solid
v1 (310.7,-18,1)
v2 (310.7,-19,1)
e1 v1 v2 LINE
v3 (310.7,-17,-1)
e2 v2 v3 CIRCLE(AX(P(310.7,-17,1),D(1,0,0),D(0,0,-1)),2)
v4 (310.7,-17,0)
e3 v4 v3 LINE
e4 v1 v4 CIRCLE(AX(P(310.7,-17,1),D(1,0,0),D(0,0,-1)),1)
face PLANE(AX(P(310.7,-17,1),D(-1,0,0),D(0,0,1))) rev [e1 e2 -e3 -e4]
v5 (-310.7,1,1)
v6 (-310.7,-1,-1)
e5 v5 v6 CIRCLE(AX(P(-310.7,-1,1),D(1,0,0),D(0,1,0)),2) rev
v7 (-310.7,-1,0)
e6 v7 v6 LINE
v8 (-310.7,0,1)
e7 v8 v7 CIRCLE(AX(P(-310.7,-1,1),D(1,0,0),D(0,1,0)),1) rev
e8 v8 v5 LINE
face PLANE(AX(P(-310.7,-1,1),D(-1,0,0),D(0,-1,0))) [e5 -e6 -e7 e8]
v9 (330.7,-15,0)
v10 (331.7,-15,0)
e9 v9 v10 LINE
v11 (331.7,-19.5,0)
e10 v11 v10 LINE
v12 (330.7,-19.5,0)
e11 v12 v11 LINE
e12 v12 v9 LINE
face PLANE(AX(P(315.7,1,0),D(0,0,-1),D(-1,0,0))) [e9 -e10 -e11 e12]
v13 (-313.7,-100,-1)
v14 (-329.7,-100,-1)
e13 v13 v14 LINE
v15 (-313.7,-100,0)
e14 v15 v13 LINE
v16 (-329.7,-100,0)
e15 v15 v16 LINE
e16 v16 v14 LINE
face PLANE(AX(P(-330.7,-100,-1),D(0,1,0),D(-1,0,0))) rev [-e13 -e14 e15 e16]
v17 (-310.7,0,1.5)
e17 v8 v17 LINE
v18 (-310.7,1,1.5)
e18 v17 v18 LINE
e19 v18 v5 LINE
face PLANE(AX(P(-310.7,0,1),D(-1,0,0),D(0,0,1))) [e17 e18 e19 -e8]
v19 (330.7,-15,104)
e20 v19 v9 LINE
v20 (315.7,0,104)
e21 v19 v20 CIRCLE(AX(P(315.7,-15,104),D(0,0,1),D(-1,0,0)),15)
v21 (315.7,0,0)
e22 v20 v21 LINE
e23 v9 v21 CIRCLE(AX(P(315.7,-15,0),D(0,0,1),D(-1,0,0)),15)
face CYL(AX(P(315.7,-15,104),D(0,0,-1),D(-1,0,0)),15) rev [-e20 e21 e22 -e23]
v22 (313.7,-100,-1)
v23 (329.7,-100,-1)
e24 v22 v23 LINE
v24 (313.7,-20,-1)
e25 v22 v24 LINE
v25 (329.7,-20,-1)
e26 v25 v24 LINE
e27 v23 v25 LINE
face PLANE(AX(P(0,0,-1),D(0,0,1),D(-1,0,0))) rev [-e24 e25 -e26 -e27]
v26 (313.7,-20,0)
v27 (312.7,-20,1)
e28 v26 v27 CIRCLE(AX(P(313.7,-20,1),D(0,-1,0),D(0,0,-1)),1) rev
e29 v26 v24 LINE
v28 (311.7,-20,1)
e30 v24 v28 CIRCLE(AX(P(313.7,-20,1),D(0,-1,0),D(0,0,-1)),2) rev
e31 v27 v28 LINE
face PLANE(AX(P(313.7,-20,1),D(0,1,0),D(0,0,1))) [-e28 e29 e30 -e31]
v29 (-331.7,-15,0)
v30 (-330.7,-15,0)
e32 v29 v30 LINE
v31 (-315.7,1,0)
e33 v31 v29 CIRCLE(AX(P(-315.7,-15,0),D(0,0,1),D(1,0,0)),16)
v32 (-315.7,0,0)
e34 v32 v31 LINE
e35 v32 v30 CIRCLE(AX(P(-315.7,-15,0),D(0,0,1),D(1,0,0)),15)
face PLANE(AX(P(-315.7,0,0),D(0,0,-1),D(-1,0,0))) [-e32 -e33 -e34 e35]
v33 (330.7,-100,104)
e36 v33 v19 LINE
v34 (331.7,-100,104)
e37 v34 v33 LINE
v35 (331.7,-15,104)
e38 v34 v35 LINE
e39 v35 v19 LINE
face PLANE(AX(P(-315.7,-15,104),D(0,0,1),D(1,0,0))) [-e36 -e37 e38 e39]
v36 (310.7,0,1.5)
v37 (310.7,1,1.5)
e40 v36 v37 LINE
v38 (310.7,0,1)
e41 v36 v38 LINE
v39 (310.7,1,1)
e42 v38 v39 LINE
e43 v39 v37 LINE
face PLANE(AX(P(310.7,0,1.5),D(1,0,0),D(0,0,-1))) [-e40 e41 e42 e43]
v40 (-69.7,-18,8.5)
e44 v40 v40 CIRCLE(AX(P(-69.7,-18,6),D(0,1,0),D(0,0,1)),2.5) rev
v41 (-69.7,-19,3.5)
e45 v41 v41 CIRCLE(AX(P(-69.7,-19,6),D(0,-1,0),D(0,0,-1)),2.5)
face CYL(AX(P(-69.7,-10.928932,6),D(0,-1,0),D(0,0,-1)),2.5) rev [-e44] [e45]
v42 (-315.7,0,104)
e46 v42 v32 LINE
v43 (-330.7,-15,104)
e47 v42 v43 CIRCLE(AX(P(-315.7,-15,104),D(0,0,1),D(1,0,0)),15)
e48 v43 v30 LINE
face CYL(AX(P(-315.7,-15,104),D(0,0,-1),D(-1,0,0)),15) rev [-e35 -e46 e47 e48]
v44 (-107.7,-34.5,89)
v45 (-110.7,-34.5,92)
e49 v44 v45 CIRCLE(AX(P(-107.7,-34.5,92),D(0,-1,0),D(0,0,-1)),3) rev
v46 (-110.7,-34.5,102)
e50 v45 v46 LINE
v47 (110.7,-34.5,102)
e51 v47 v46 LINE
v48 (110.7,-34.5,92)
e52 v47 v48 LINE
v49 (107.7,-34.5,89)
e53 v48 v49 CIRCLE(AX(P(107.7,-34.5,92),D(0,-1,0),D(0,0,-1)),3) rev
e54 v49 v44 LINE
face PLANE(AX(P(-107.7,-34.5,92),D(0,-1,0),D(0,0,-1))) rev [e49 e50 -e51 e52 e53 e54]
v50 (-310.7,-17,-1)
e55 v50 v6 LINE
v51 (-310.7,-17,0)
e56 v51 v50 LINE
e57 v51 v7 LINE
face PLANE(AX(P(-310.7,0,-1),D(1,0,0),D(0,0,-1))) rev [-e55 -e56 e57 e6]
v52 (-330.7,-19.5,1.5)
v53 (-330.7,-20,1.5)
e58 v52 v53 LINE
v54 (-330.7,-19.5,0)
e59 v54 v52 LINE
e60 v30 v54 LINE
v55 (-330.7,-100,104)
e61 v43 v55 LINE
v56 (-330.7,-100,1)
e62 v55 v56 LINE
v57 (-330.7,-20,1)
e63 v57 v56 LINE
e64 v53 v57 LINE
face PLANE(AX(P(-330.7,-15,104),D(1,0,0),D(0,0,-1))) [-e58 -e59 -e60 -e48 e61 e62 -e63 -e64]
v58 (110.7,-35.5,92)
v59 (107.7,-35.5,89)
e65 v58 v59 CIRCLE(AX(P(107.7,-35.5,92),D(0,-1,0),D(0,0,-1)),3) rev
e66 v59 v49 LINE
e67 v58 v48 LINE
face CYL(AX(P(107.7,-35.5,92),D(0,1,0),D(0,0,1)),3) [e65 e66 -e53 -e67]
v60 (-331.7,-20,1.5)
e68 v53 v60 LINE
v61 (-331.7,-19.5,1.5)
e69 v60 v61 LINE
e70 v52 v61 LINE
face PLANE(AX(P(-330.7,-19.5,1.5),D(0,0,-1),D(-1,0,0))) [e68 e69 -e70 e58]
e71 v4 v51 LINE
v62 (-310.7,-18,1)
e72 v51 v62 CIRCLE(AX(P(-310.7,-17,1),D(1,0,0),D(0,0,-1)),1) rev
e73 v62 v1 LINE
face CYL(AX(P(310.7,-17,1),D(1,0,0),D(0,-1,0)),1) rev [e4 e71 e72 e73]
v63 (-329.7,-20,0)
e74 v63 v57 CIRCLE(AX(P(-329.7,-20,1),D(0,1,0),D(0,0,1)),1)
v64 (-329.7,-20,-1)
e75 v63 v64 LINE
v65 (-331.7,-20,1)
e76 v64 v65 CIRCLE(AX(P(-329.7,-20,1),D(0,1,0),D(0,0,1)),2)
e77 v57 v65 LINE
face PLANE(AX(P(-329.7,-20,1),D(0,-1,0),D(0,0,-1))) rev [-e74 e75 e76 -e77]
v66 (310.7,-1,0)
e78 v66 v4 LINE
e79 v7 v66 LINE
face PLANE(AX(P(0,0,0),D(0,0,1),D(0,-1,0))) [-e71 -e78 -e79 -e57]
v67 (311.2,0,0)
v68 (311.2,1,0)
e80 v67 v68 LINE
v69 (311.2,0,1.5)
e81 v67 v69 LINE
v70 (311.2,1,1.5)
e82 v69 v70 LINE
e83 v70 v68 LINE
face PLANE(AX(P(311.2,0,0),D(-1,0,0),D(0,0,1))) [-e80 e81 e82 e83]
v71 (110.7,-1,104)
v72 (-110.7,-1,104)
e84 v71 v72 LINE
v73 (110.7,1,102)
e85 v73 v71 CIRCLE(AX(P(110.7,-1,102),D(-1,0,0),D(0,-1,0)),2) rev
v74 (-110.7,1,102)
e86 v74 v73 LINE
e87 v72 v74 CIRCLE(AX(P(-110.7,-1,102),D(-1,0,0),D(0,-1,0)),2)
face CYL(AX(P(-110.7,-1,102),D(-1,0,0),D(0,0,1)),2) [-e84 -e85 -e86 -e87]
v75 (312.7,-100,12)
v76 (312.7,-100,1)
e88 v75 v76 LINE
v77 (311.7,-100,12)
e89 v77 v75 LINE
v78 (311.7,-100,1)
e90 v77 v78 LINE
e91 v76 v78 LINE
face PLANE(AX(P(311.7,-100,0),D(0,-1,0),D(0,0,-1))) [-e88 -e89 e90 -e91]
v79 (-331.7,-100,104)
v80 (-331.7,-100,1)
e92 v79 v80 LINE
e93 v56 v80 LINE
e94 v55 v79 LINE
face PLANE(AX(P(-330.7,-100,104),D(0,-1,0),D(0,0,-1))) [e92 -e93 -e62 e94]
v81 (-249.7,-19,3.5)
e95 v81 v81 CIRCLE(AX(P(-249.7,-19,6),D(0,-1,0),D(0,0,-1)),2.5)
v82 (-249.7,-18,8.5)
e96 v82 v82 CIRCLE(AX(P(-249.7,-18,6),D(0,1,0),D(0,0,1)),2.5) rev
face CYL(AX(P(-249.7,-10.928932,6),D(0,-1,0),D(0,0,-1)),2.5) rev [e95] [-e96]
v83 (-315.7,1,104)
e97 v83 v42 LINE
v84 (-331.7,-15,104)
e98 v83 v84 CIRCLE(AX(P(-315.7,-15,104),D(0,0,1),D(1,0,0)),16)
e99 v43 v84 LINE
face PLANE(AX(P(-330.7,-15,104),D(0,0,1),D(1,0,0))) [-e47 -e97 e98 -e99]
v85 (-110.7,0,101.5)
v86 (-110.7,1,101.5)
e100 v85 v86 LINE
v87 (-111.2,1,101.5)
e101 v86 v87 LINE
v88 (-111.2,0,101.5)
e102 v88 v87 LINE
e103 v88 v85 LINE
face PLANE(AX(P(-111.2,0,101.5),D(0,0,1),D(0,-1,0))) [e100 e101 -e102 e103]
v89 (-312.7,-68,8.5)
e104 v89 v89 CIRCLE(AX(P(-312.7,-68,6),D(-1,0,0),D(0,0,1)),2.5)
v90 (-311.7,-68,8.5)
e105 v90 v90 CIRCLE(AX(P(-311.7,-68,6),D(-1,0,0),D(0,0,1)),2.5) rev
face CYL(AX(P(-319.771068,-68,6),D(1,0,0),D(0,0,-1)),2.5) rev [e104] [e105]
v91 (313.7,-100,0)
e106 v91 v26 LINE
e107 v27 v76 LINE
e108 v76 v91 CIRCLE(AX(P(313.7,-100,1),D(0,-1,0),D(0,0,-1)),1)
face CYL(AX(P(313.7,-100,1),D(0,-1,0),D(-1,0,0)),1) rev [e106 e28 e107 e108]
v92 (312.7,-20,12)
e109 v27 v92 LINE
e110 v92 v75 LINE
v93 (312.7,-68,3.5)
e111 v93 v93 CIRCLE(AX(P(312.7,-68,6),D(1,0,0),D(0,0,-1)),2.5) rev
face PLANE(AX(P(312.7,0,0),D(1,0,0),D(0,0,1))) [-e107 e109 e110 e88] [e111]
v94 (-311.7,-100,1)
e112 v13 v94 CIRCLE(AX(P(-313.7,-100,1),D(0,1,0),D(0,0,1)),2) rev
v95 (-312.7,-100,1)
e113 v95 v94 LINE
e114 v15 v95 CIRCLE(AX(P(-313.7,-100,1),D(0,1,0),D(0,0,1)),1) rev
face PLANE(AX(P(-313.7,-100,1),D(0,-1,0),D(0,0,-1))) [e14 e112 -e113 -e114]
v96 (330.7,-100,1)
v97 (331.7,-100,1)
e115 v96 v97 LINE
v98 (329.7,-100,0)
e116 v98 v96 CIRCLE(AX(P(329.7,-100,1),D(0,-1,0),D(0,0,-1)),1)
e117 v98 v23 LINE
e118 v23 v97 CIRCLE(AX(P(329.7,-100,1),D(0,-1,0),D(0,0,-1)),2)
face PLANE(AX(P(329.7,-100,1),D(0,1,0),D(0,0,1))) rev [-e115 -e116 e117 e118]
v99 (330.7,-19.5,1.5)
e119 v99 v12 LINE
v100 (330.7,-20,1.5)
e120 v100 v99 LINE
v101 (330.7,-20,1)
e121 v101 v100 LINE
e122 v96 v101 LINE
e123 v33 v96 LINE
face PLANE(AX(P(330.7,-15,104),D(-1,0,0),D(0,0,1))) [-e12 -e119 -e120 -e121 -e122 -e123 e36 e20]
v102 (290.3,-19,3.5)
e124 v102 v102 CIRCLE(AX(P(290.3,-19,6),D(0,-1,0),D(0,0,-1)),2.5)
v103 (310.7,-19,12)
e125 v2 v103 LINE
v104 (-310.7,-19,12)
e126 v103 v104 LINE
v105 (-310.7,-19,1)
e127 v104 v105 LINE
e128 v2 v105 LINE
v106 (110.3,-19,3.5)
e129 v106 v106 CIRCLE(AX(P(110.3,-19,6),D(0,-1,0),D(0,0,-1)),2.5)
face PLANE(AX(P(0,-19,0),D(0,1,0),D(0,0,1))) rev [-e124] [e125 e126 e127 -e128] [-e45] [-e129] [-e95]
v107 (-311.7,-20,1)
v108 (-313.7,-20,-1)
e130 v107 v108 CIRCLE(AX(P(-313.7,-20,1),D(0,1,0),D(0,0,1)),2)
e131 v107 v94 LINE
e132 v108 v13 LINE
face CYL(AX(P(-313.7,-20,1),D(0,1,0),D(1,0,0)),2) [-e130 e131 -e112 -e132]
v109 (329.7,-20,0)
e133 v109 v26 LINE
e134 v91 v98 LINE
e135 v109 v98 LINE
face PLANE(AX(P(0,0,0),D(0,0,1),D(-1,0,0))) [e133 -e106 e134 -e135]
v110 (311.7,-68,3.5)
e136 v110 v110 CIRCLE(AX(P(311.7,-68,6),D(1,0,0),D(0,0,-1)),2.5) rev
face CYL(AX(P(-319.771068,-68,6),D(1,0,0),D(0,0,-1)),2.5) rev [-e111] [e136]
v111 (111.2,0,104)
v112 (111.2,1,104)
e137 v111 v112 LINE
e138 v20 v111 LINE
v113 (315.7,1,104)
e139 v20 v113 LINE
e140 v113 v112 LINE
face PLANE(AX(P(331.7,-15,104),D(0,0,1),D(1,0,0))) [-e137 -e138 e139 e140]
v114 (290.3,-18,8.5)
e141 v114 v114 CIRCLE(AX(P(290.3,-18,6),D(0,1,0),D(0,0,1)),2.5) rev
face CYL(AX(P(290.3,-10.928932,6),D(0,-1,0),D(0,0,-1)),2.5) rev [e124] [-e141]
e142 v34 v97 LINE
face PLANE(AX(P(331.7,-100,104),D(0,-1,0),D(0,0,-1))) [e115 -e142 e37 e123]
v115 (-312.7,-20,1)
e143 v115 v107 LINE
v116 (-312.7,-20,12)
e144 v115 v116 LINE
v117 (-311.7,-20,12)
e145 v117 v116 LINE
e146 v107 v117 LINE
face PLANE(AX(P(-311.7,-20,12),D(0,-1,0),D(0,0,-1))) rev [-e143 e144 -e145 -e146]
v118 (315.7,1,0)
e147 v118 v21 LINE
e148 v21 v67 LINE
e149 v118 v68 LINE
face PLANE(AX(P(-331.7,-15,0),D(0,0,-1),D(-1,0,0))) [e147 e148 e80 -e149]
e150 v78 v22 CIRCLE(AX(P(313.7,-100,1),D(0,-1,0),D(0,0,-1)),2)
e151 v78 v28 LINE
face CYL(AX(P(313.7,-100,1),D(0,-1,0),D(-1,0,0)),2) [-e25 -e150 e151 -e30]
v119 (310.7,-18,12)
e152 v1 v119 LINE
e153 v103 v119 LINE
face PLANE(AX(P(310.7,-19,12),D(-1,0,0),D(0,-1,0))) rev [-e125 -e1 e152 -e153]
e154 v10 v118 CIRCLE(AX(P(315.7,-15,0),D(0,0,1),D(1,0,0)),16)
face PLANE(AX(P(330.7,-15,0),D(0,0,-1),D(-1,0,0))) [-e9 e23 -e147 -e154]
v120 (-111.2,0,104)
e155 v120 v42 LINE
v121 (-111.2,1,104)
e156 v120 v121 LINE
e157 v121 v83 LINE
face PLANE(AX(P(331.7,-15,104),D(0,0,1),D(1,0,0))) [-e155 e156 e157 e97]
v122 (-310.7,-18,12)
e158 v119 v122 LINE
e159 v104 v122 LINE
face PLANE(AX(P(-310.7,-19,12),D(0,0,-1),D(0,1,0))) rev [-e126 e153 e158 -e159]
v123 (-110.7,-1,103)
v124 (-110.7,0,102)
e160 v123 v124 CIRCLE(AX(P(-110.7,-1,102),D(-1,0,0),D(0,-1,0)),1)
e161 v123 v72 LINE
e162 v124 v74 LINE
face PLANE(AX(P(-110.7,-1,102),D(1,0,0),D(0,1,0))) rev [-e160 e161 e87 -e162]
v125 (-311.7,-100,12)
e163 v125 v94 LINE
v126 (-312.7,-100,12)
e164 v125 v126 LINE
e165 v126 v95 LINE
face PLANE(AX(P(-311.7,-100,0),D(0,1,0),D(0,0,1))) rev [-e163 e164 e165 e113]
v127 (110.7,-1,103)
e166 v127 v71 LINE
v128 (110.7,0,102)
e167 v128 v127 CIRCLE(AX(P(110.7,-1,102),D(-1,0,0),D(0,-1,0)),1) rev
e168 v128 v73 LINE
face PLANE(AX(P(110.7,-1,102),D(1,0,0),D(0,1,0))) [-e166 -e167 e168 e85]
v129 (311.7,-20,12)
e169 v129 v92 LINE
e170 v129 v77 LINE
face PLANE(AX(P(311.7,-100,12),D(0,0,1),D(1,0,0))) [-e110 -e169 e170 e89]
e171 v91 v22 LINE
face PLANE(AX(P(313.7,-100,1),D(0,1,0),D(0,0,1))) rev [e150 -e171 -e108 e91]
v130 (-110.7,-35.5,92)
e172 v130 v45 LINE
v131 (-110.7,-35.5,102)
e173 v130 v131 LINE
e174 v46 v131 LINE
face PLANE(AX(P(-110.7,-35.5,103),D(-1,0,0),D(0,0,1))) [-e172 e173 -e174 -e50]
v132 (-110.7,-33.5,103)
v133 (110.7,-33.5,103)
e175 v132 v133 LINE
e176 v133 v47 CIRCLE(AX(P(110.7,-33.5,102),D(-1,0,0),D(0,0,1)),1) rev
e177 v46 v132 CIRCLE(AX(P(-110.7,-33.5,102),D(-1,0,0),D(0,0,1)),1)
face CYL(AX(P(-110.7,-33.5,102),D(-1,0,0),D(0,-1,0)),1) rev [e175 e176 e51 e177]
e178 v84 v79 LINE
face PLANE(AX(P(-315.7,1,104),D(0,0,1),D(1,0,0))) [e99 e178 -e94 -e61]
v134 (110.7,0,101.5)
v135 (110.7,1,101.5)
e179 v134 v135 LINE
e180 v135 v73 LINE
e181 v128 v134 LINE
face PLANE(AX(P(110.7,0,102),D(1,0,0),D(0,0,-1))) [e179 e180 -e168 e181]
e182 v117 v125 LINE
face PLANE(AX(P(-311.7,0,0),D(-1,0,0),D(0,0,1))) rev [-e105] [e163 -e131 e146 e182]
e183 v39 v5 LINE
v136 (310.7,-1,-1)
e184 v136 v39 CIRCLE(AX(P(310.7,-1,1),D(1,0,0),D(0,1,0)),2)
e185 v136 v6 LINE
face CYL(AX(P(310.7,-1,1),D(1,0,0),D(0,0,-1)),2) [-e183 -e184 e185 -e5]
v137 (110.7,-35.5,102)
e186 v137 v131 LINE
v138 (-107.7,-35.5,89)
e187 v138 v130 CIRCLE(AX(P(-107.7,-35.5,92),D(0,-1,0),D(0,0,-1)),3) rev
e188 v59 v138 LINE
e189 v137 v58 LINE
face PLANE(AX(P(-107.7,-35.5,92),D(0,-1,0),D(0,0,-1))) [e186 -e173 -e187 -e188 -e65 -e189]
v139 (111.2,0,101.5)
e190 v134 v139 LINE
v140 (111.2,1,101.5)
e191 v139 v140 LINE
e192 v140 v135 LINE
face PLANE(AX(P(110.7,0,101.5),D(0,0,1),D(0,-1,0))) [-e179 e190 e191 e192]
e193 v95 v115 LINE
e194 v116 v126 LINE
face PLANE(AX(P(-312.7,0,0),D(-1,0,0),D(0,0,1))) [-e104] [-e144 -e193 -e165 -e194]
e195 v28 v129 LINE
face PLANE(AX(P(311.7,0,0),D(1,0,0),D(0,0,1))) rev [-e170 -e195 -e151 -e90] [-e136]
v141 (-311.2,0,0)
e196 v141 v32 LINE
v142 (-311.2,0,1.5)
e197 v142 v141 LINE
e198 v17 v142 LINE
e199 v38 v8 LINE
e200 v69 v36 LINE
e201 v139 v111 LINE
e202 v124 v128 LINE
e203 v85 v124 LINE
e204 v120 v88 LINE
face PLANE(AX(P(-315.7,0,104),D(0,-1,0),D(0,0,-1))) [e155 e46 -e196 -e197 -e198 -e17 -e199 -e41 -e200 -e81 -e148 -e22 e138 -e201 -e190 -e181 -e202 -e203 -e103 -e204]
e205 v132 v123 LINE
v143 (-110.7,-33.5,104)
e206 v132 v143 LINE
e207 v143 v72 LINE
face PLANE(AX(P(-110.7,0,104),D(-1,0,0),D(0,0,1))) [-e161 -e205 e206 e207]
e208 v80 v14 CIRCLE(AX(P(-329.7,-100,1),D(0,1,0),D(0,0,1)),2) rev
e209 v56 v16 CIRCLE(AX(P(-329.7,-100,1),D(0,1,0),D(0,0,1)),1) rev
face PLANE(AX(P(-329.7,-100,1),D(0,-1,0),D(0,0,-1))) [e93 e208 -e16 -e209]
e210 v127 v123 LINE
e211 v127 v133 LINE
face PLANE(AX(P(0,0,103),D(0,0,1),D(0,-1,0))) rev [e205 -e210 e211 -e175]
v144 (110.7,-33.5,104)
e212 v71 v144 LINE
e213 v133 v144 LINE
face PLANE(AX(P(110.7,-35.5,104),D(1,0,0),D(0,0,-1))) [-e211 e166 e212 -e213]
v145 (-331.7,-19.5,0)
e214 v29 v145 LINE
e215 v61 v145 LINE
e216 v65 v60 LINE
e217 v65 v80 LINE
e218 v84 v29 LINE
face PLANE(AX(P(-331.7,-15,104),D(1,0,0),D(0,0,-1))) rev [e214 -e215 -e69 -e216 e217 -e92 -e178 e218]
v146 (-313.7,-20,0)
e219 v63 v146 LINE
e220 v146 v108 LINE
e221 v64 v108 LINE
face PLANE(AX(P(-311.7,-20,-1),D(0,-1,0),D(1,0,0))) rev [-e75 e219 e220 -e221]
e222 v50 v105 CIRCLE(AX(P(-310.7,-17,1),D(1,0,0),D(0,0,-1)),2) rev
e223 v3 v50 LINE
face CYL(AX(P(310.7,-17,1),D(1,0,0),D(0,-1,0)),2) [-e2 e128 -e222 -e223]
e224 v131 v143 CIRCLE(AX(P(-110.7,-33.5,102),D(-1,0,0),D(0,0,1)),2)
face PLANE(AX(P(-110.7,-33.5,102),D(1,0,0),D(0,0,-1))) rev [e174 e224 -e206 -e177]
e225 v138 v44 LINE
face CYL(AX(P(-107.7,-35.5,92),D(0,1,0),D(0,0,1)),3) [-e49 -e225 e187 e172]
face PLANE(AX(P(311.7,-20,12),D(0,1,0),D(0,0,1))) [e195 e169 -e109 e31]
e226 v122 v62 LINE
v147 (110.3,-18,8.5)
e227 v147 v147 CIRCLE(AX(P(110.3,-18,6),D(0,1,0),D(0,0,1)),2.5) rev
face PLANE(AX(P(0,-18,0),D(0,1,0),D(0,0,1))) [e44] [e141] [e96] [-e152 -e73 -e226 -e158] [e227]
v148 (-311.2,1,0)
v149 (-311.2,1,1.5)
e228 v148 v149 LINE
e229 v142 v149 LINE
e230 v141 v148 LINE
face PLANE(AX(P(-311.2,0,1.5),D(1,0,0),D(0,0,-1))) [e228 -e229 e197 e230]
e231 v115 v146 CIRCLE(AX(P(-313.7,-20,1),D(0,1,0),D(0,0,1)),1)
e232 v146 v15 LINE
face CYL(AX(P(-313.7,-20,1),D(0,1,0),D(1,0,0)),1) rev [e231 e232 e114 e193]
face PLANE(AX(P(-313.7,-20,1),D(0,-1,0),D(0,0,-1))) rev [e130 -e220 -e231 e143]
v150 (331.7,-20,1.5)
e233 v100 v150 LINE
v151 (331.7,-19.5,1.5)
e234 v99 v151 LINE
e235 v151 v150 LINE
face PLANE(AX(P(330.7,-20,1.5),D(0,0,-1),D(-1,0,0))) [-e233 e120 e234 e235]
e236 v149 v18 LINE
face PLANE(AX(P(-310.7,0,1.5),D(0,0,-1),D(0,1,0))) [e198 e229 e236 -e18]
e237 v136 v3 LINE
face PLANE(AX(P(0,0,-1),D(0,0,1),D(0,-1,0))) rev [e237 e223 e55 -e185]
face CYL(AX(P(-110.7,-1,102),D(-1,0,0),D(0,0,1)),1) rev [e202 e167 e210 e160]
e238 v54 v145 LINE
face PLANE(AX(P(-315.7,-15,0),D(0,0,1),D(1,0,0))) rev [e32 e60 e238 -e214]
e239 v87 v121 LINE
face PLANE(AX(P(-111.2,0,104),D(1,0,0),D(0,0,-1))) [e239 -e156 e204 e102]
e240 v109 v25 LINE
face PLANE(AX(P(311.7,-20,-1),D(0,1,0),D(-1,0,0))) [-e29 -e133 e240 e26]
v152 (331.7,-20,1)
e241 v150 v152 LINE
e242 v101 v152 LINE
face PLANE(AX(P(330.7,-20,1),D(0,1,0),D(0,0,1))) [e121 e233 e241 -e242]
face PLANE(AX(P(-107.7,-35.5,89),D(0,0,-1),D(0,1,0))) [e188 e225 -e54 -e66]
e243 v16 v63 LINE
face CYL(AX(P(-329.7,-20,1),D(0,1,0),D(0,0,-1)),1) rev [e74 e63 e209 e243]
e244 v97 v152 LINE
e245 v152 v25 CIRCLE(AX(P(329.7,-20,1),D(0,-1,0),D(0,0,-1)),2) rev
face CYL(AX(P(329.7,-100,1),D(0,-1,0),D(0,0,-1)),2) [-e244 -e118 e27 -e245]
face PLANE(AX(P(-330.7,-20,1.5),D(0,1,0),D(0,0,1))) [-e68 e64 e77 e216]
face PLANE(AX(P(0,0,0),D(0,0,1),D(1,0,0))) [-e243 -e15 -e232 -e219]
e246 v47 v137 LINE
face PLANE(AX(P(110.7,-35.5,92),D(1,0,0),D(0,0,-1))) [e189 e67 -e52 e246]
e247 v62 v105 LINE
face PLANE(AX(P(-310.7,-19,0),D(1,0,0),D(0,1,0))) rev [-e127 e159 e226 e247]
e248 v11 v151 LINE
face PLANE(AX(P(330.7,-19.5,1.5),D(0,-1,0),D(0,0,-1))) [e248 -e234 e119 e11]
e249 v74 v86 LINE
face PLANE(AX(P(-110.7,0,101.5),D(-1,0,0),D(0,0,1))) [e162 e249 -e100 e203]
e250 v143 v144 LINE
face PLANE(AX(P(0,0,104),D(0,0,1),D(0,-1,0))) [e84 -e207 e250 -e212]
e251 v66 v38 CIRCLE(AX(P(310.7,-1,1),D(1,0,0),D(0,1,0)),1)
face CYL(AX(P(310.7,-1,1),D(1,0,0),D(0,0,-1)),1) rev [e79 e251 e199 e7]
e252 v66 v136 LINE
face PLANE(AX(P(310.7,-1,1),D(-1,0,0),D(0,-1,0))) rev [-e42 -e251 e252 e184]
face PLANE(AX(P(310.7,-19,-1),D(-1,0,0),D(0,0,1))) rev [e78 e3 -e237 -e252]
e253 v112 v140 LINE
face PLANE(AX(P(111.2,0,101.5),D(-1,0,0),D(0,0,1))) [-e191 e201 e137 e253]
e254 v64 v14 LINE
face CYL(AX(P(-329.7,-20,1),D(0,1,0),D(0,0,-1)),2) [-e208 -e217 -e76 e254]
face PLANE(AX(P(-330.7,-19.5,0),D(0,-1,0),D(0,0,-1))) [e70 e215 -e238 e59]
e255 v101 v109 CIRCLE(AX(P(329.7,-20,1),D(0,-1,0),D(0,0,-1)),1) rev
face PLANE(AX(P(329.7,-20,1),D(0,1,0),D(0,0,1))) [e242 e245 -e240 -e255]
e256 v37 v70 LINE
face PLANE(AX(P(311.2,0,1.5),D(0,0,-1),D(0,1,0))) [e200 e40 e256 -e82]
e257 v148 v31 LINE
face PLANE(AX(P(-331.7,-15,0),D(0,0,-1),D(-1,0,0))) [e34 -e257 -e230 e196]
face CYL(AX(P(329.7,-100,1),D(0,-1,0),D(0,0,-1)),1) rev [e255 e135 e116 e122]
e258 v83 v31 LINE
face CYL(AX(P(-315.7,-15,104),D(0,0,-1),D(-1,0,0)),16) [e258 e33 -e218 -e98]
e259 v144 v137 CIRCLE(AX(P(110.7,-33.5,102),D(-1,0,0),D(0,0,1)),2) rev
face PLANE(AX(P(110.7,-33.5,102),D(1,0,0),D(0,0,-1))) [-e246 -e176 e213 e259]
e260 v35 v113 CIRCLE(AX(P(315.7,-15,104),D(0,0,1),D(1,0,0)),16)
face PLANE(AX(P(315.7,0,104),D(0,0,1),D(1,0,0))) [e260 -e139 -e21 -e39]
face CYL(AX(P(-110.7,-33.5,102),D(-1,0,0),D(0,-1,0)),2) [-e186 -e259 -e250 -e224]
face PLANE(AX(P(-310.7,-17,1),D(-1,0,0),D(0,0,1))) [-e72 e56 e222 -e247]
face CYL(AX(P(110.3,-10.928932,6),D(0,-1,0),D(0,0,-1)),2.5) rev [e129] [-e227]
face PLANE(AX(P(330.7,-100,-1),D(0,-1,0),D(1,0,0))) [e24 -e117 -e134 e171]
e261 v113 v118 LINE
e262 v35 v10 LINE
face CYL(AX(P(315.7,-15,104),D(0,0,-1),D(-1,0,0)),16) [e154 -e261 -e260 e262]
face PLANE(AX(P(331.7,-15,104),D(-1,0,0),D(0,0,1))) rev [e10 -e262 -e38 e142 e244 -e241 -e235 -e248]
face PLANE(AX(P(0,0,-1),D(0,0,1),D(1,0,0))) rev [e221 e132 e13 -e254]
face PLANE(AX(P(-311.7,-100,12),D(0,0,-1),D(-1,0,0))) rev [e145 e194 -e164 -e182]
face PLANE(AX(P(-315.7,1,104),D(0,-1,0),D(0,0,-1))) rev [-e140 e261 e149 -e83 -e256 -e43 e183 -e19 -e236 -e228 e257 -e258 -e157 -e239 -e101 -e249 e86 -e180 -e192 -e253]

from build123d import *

# Parameters (mm, degrees)
BASE_FLANGE1_DEPTH             = 104
EDGE_FLANGE1_STRIP_W           = 6
EDGE_FLANGE1_STRIP_H           = 1
EDGE_FLANGE1_STRIP_CUT_DEPTH   = 621.4
EDGE_FLANGE1_RELIEF_W          = 6.5
EDGE_FLANGE1_RELIEF_H          = 0.5
EDGE_FLANGE1_RELIEF_CUT_DEPTH  = 1
EDGE_FLANGE1_DEPTH             = 621.4
EDGE_FLANGE2_STRIP_W           = 6
EDGE_FLANGE2_STRIP_H           = 1
EDGE_FLANGE2_STRIP_CUT_DEPTH   = 621.4
EDGE_FLANGE2_DEPTH             = 621.4
EDGE_FLANGE3_STRIP_W           = 6
EDGE_FLANGE3_STRIP_H           = 1
EDGE_FLANGE3_STRIP_CUT_DEPTH   = 80
EDGE_FLANGE3_RELIEF_W          = 6.5
EDGE_FLANGE3_RELIEF_H          = 0.5
EDGE_FLANGE3_RELIEF_CUT_DEPTH  = 1
EDGE_FLANGE3_DEPTH             = 80
EDGE_FLANGE4_STRIP_W           = 6
EDGE_FLANGE4_STRIP_H           = 1
EDGE_FLANGE4_STRIP_CUT_DEPTH   = 80
EDGE_FLANGE4_DEPTH             = 80
EDGE_FLANGE5_STRIP_W           = 6
EDGE_FLANGE5_STRIP_H           = 1
EDGE_FLANGE5_STRIP_CUT_DEPTH   = 221.4
EDGE_FLANGE5_RELIEF_W          = 6.5
EDGE_FLANGE5_RELIEF_H          = 0.5
EDGE_FLANGE5_RELIEF_CUT_DEPTH  = 1
EDGE_FLANGE5_DEPTH             = 221.4
SKETCH22_R                     = 2.5
CUT_EXTRUDE1_DEPTH             = 1
SKETCH23_R                     = 2.5
CUT_EXTRUDE2_DEPTH             = 3
CUT_EXTRUDE2_DIRECTION_2_REACH = 661.378
EDGE_FLANGE6_STRIP_W           = 6
EDGE_FLANGE6_STRIP_H           = 1
EDGE_FLANGE6_STRIP_CUT_DEPTH   = 221.4
EDGE_FLANGE6_DEPTH             = 221.4
EDGE_FLANGE6_FLAT_DEPTH        = 1


# Sheet-metal steps are written as plain solids
with BuildPart() as part:
    # Sketch1 → Base-Flange1 (new body)
    with BuildSketch(Plane.XY):
        with BuildLine():
            Line((-330.7, -100), (-330.7, -15))
            ThreePointArc((-330.7, -15), (-326.306601718, -4.393398282), (-315.7, 0))
            Line((-315.7, 0), (315.7, 0))
            ThreePointArc((315.7, 0), (326.306601718, -4.393398282), (330.7, -15))
            Line((330.7, -15), (330.7, -100))
            Line((330.7, -100), (331.7, -100))
            Line((331.7, -100), (331.7, -15))
            ThreePointArc((331.7, -15), (327.013708499, -3.686291501), (315.7, 1))
            Line((315.7, 1), (-315.7, 1))
            ThreePointArc((-315.7, 1), (-327.013708499, -3.686291501), (-331.7, -15))
            Line((-331.7, -15), (-331.7, -100))
            Line((-331.7, -100), (-330.7, -100))
        make_face()
    extrude(amount=BASE_FLANGE1_DEPTH)

    # Edge-Flange1 strip (across the edge) → Edge-Flange1 strip cut (cut)
    with BuildSketch(Plane(origin=(-310.7, 0, 0), x_dir=(0, 0, 1), z_dir=(1, 0, 0))):
        with Locations((-2, -0.5)):
            Rectangle(EDGE_FLANGE1_STRIP_W, EDGE_FLANGE1_STRIP_H)
    extrude(amount=EDGE_FLANGE1_STRIP_CUT_DEPTH, mode=Mode.SUBTRACT)

    # Edge-Flange1 relief (on the sheet) → Edge-Flange1 relief cut (cut)
    with BuildSketch(Plane(origin=(-310.7, 0, 1), x_dir=(0, 0, 1), z_dir=(0, -1, 0))):
        with Locations((-2.75, 0.25)):
            Rectangle(EDGE_FLANGE1_RELIEF_W, EDGE_FLANGE1_RELIEF_H)
        with Locations((-2.75, -621.65)):
            Rectangle(EDGE_FLANGE1_RELIEF_W, EDGE_FLANGE1_RELIEF_H)
    extrude(amount=-EDGE_FLANGE1_RELIEF_CUT_DEPTH, mode=Mode.SUBTRACT)

    # Edge-Flange1 section (across the edge) → Edge-Flange1 (add)
    with BuildSketch(Plane(origin=(-310.7, 0, 0), x_dir=(0, 0, 1), z_dir=(1, 0, 0))):
        with BuildLine():
            Line((-1, 1), (-1, 19))
            Line((-1, 19), (0, 19))
            Line((0, 19), (0, 1))
            ThreePointArc((0, 1), (0.292893219, 0.292893219), (1, 0))
            Line((1, 0), (1, -1))
            ThreePointArc((1, -1), (-0.414213562, -0.414213562), (-1, 1))
        make_face()
    extrude(amount=EDGE_FLANGE1_DEPTH)

    # Edge-Flange2 strip (across the edge) → Edge-Flange2 strip cut (cut)
    with BuildSketch(Plane(origin=(-310.7, -19, 0), x_dir=(0, 1, 0), z_dir=(1, 0, 0))):
        with Locations((-1, -0.5)):
            Rectangle(EDGE_FLANGE2_STRIP_W, EDGE_FLANGE2_STRIP_H)
    extrude(amount=EDGE_FLANGE2_STRIP_CUT_DEPTH, mode=Mode.SUBTRACT)

    # Edge-Flange2 section (across the edge) → Edge-Flange2 (add)
    with BuildSketch(Plane(origin=(-310.7, -19, 0), x_dir=(0, 1, 0), z_dir=(1, 0, 0))):
        with BuildLine():
            Line((0, 1), (0, 12))
            Line((0, 12), (1, 12))
            Line((1, 12), (1, 1))
            ThreePointArc((1, 1), (1.292893219, 0.292893219), (2, 0))
            Line((2, 0), (2, -1))
            ThreePointArc((2, -1), (0.585786438, -0.414213562), (0, 1))
        make_face()
    extrude(amount=EDGE_FLANGE2_DEPTH)

    # Edge-Flange3 strip (across the edge) → Edge-Flange3 strip cut (cut)
    with BuildSketch(Plane(origin=(-330.7, -100, 0), x_dir=(0, 0, 1), z_dir=(0, 1, 0))):
        with Locations((-2, -0.5)):
            Rectangle(EDGE_FLANGE3_STRIP_W, EDGE_FLANGE3_STRIP_H)
    edge_flange3_strip_cut = extrude(amount=EDGE_FLANGE3_STRIP_CUT_DEPTH, mode=Mode.SUBTRACT)

    # Edge-Flange3 relief (on the sheet) → Edge-Flange3 relief cut (cut)
    with BuildSketch(Plane(origin=(-330.7, -100, 1), x_dir=(0, 0, 1), z_dir=(1, 0, 0))):
        with Locations((-2.75, -80.25)):
            Rectangle(EDGE_FLANGE3_RELIEF_W, EDGE_FLANGE3_RELIEF_H)
    edge_flange3_relief_cut = extrude(amount=-EDGE_FLANGE3_RELIEF_CUT_DEPTH, mode=Mode.SUBTRACT)

    # Edge-Flange3 section (across the edge) → Edge-Flange3 (add)
    with BuildSketch(Plane(origin=(-330.7, -100, 0), x_dir=(0, 0, 1), z_dir=(0, 1, 0))):
        with BuildLine():
            Line((-1, 1), (-1, 19))
            Line((-1, 19), (0, 19))
            Line((0, 19), (0, 1))
            ThreePointArc((0, 1), (0.292893219, 0.292893219), (1, 0))
            Line((1, 0), (1, -1))
            ThreePointArc((1, -1), (-0.414213562, -0.414213562), (-1, 1))
        make_face()
    edge_flange3 = extrude(amount=EDGE_FLANGE3_DEPTH)

    # Edge-Flange4 strip (across the edge) → Edge-Flange4 strip cut (cut)
    with BuildSketch(Plane(origin=(-311.7, -100, 0), x_dir=(-1, 0, 0), z_dir=(0, 1, 0))):
        with Locations((-1, -0.5)):
            Rectangle(EDGE_FLANGE4_STRIP_W, EDGE_FLANGE4_STRIP_H)
    edge_flange4_strip_cut = extrude(amount=EDGE_FLANGE4_STRIP_CUT_DEPTH, mode=Mode.SUBTRACT)

    # Edge-Flange4 section (across the edge) → Edge-Flange4 (add)
    with BuildSketch(Plane(origin=(-311.7, -100, 0), x_dir=(-1, 0, 0), z_dir=(0, 1, 0))):
        with BuildLine():
            Line((0, 1), (0, 12))
            Line((0, 12), (1, 12))
            Line((1, 12), (1, 1))
            ThreePointArc((1, 1), (1.292893219, 0.292893219), (2, 0))
            Line((2, 0), (2, -1))
            ThreePointArc((2, -1), (0.585786438, -0.414213562), (0, 1))
        make_face()
    edge_flange4 = extrude(amount=EDGE_FLANGE4_DEPTH)

    # Mirror1: Edge-Flange3 strip cut, Edge-Flange3 relief cut, Edge-Flange3, Edge-Flange4 strip cut, Edge-Flange4 across plane
    add(edge_flange3_strip_cut.mirror(Plane(origin=(0, 0, 0), x_dir=(0, 0, 1), z_dir=(1, 0, 0))), mode=Mode.SUBTRACT)
    add(edge_flange3_relief_cut.mirror(Plane(origin=(0, 0, 0), x_dir=(0, 0, 1), z_dir=(1, 0, 0))), mode=Mode.SUBTRACT)
    add(edge_flange3.mirror(Plane(origin=(0, 0, 0), x_dir=(0, 0, 1), z_dir=(1, 0, 0))))
    add(edge_flange4_strip_cut.mirror(Plane(origin=(0, 0, 0), x_dir=(0, 0, 1), z_dir=(1, 0, 0))), mode=Mode.SUBTRACT)
    add(edge_flange4.mirror(Plane(origin=(0, 0, 0), x_dir=(0, 0, 1), z_dir=(1, 0, 0))))

    # Edge-Flange5 strip (across the edge) → Edge-Flange5 strip cut (cut)
    with BuildSketch(Plane(origin=(110.7, 0, 104), x_dir=(0, 0, -1), z_dir=(-1, 0, 0))):
        with Locations((-1, -0.5)):
            Rectangle(EDGE_FLANGE5_STRIP_W, EDGE_FLANGE5_STRIP_H)
    extrude(amount=EDGE_FLANGE5_STRIP_CUT_DEPTH, mode=Mode.SUBTRACT)

    # Edge-Flange5 relief (on the sheet) → Edge-Flange5 relief cut (cut)
    with BuildSketch(Plane(origin=(110.7, 0, 102), x_dir=(0, 0, -1), z_dir=(0, -1, 0))):
        with Locations((-2.75, 0.25)):
            Rectangle(EDGE_FLANGE5_RELIEF_W, EDGE_FLANGE5_RELIEF_H)
        with Locations((-2.75, -221.65)):
            Rectangle(EDGE_FLANGE5_RELIEF_W, EDGE_FLANGE5_RELIEF_H)
    extrude(amount=-EDGE_FLANGE5_RELIEF_CUT_DEPTH, mode=Mode.SUBTRACT)

    # Edge-Flange5 section (across the edge) → Edge-Flange5 (add)
    with BuildSketch(Plane(origin=(110.7, 0, 104), x_dir=(0, 0, -1), z_dir=(-1, 0, 0))):
        with BuildLine():
            Line((0, 1), (0, 35.5))
            Line((0, 35.5), (1, 35.5))
            Line((1, 35.5), (1, 1))
            ThreePointArc((1, 1), (1.292893219, 0.292893219), (2, 0))
            Line((2, 0), (2, -1))
            ThreePointArc((2, -1), (0.585786438, -0.414213562), (0, 1))
        make_face()
    extrude(amount=EDGE_FLANGE5_DEPTH)

    # Sketch22 → Cut-Extrude1 (cut)
    with BuildSketch(Plane.XZ.offset(19)):
        with Locations(Location((-249.7, 6, 0), (0, 0, 270))):
            Circle(SKETCH22_R)
        with Locations(Location((-69.7, 6, 0), (0, 0, 270))):
            Circle(SKETCH22_R)
        with Locations(Location((110.3, 6, 0), (0, 0, 270))):
            Circle(SKETCH22_R)
        with Locations(Location((290.3, 6, 0), (0, 0, 270))):
            Circle(SKETCH22_R)
        with Locations((470.3, 6)):
            Circle(SKETCH22_R)
        with Locations((650.3, 6)):
            Circle(SKETCH22_R)
        with Locations((830.3, 6)):
            Circle(SKETCH22_R)
    extrude(amount=-CUT_EXTRUDE1_DEPTH, mode=Mode.SUBTRACT)

    # Sketch23 → Cut-Extrude2 (cut)
    with BuildSketch(Plane.ZY.offset(-311.7)):
        with Locations(Location((6, -68, 0), (0, 0, 180))):
            Circle(SKETCH23_R)
    extrude(amount=-CUT_EXTRUDE2_DEPTH, mode=Mode.SUBTRACT)

    # Cut-Extrude2 direction 2: up to this face of the body (flat: up to its plane)
    cut_extrude2_direction_2_end = Plane(part.part.faces().sort_by_distance((-312.7, -60, 6.5))[0])
    # Sketch23 → Cut-Extrude2 direction 2 (cut, up to the picked face)
    with BuildSketch(Plane.ZY.offset(-311.7), mode=Mode.PRIVATE) as cut_extrude2_direction_2_sk1:
        with Locations(Location((6, -68, 0), (0, 0, 180))):
            Circle(SKETCH23_R)
    cut_extrude2_direction_2_tool1 = split(extrude(cut_extrude2_direction_2_sk1.sketch, amount=CUT_EXTRUDE2_DIRECTION_2_REACH, mode=Mode.PRIVATE), bisect_by=cut_extrude2_direction_2_end, keep=Keep.BOTH, mode=Mode.PRIVATE)
    add(cut_extrude2_direction_2_tool1.solids().sort_by(Axis((311.7, -68, 6), (-1, 0, 0)))[0], mode=Mode.SUBTRACT)

    # Edge-Flange6 strip (across the edge) → Edge-Flange6 strip cut (cut)
    with BuildSketch(Plane(origin=(110.7, -35.5, 103), x_dir=(0, 1, 0), z_dir=(-1, 0, 0))):
        with Locations((-1, -0.5)):
            Rectangle(EDGE_FLANGE6_STRIP_W, EDGE_FLANGE6_STRIP_H)
    extrude(amount=EDGE_FLANGE6_STRIP_CUT_DEPTH, mode=Mode.SUBTRACT)

    # Edge-Flange6 bend section (across the edge) → Edge-Flange6 (add)
    with BuildSketch(Plane(origin=(110.7, -35.5, 103), x_dir=(0, 1, 0), z_dir=(-1, 0, 0))):
        with BuildLine():
            Line((0, 1), (1, 1))
            ThreePointArc((1, 1), (1.292893219, 0.292893219), (2, 0))
            Line((2, 0), (2, -1))
            ThreePointArc((2, -1), (0.585786438, -0.414213562), (0, 1))
        make_face()
    extrude(amount=EDGE_FLANGE6_DEPTH)

    # Edge-Flange6 profile (on flange) → Edge-Flange6 flat (add)
    with BuildSketch(Plane(origin=(0, -35.5, 103), x_dir=(1, 0, 0), z_dir=(0, 1, 0))):
        with BuildLine():
            Line((-110.7, 1), (110.7, 1))
            Line((110.7, 1), (110.7, 11))
            ThreePointArc((110.7, 11), (109.821320344, 13.121320344), (107.7, 14))
            Line((107.7, 14), (-107.7, 14))
            ThreePointArc((-107.7, 14), (-109.821320344, 13.121320344), (-110.7, 11))
            Line((-110.7, 11), (-110.7, 1))
        make_face()
    extrude(amount=EDGE_FLANGE6_FLAT_DEPTH)


solid = part.part
